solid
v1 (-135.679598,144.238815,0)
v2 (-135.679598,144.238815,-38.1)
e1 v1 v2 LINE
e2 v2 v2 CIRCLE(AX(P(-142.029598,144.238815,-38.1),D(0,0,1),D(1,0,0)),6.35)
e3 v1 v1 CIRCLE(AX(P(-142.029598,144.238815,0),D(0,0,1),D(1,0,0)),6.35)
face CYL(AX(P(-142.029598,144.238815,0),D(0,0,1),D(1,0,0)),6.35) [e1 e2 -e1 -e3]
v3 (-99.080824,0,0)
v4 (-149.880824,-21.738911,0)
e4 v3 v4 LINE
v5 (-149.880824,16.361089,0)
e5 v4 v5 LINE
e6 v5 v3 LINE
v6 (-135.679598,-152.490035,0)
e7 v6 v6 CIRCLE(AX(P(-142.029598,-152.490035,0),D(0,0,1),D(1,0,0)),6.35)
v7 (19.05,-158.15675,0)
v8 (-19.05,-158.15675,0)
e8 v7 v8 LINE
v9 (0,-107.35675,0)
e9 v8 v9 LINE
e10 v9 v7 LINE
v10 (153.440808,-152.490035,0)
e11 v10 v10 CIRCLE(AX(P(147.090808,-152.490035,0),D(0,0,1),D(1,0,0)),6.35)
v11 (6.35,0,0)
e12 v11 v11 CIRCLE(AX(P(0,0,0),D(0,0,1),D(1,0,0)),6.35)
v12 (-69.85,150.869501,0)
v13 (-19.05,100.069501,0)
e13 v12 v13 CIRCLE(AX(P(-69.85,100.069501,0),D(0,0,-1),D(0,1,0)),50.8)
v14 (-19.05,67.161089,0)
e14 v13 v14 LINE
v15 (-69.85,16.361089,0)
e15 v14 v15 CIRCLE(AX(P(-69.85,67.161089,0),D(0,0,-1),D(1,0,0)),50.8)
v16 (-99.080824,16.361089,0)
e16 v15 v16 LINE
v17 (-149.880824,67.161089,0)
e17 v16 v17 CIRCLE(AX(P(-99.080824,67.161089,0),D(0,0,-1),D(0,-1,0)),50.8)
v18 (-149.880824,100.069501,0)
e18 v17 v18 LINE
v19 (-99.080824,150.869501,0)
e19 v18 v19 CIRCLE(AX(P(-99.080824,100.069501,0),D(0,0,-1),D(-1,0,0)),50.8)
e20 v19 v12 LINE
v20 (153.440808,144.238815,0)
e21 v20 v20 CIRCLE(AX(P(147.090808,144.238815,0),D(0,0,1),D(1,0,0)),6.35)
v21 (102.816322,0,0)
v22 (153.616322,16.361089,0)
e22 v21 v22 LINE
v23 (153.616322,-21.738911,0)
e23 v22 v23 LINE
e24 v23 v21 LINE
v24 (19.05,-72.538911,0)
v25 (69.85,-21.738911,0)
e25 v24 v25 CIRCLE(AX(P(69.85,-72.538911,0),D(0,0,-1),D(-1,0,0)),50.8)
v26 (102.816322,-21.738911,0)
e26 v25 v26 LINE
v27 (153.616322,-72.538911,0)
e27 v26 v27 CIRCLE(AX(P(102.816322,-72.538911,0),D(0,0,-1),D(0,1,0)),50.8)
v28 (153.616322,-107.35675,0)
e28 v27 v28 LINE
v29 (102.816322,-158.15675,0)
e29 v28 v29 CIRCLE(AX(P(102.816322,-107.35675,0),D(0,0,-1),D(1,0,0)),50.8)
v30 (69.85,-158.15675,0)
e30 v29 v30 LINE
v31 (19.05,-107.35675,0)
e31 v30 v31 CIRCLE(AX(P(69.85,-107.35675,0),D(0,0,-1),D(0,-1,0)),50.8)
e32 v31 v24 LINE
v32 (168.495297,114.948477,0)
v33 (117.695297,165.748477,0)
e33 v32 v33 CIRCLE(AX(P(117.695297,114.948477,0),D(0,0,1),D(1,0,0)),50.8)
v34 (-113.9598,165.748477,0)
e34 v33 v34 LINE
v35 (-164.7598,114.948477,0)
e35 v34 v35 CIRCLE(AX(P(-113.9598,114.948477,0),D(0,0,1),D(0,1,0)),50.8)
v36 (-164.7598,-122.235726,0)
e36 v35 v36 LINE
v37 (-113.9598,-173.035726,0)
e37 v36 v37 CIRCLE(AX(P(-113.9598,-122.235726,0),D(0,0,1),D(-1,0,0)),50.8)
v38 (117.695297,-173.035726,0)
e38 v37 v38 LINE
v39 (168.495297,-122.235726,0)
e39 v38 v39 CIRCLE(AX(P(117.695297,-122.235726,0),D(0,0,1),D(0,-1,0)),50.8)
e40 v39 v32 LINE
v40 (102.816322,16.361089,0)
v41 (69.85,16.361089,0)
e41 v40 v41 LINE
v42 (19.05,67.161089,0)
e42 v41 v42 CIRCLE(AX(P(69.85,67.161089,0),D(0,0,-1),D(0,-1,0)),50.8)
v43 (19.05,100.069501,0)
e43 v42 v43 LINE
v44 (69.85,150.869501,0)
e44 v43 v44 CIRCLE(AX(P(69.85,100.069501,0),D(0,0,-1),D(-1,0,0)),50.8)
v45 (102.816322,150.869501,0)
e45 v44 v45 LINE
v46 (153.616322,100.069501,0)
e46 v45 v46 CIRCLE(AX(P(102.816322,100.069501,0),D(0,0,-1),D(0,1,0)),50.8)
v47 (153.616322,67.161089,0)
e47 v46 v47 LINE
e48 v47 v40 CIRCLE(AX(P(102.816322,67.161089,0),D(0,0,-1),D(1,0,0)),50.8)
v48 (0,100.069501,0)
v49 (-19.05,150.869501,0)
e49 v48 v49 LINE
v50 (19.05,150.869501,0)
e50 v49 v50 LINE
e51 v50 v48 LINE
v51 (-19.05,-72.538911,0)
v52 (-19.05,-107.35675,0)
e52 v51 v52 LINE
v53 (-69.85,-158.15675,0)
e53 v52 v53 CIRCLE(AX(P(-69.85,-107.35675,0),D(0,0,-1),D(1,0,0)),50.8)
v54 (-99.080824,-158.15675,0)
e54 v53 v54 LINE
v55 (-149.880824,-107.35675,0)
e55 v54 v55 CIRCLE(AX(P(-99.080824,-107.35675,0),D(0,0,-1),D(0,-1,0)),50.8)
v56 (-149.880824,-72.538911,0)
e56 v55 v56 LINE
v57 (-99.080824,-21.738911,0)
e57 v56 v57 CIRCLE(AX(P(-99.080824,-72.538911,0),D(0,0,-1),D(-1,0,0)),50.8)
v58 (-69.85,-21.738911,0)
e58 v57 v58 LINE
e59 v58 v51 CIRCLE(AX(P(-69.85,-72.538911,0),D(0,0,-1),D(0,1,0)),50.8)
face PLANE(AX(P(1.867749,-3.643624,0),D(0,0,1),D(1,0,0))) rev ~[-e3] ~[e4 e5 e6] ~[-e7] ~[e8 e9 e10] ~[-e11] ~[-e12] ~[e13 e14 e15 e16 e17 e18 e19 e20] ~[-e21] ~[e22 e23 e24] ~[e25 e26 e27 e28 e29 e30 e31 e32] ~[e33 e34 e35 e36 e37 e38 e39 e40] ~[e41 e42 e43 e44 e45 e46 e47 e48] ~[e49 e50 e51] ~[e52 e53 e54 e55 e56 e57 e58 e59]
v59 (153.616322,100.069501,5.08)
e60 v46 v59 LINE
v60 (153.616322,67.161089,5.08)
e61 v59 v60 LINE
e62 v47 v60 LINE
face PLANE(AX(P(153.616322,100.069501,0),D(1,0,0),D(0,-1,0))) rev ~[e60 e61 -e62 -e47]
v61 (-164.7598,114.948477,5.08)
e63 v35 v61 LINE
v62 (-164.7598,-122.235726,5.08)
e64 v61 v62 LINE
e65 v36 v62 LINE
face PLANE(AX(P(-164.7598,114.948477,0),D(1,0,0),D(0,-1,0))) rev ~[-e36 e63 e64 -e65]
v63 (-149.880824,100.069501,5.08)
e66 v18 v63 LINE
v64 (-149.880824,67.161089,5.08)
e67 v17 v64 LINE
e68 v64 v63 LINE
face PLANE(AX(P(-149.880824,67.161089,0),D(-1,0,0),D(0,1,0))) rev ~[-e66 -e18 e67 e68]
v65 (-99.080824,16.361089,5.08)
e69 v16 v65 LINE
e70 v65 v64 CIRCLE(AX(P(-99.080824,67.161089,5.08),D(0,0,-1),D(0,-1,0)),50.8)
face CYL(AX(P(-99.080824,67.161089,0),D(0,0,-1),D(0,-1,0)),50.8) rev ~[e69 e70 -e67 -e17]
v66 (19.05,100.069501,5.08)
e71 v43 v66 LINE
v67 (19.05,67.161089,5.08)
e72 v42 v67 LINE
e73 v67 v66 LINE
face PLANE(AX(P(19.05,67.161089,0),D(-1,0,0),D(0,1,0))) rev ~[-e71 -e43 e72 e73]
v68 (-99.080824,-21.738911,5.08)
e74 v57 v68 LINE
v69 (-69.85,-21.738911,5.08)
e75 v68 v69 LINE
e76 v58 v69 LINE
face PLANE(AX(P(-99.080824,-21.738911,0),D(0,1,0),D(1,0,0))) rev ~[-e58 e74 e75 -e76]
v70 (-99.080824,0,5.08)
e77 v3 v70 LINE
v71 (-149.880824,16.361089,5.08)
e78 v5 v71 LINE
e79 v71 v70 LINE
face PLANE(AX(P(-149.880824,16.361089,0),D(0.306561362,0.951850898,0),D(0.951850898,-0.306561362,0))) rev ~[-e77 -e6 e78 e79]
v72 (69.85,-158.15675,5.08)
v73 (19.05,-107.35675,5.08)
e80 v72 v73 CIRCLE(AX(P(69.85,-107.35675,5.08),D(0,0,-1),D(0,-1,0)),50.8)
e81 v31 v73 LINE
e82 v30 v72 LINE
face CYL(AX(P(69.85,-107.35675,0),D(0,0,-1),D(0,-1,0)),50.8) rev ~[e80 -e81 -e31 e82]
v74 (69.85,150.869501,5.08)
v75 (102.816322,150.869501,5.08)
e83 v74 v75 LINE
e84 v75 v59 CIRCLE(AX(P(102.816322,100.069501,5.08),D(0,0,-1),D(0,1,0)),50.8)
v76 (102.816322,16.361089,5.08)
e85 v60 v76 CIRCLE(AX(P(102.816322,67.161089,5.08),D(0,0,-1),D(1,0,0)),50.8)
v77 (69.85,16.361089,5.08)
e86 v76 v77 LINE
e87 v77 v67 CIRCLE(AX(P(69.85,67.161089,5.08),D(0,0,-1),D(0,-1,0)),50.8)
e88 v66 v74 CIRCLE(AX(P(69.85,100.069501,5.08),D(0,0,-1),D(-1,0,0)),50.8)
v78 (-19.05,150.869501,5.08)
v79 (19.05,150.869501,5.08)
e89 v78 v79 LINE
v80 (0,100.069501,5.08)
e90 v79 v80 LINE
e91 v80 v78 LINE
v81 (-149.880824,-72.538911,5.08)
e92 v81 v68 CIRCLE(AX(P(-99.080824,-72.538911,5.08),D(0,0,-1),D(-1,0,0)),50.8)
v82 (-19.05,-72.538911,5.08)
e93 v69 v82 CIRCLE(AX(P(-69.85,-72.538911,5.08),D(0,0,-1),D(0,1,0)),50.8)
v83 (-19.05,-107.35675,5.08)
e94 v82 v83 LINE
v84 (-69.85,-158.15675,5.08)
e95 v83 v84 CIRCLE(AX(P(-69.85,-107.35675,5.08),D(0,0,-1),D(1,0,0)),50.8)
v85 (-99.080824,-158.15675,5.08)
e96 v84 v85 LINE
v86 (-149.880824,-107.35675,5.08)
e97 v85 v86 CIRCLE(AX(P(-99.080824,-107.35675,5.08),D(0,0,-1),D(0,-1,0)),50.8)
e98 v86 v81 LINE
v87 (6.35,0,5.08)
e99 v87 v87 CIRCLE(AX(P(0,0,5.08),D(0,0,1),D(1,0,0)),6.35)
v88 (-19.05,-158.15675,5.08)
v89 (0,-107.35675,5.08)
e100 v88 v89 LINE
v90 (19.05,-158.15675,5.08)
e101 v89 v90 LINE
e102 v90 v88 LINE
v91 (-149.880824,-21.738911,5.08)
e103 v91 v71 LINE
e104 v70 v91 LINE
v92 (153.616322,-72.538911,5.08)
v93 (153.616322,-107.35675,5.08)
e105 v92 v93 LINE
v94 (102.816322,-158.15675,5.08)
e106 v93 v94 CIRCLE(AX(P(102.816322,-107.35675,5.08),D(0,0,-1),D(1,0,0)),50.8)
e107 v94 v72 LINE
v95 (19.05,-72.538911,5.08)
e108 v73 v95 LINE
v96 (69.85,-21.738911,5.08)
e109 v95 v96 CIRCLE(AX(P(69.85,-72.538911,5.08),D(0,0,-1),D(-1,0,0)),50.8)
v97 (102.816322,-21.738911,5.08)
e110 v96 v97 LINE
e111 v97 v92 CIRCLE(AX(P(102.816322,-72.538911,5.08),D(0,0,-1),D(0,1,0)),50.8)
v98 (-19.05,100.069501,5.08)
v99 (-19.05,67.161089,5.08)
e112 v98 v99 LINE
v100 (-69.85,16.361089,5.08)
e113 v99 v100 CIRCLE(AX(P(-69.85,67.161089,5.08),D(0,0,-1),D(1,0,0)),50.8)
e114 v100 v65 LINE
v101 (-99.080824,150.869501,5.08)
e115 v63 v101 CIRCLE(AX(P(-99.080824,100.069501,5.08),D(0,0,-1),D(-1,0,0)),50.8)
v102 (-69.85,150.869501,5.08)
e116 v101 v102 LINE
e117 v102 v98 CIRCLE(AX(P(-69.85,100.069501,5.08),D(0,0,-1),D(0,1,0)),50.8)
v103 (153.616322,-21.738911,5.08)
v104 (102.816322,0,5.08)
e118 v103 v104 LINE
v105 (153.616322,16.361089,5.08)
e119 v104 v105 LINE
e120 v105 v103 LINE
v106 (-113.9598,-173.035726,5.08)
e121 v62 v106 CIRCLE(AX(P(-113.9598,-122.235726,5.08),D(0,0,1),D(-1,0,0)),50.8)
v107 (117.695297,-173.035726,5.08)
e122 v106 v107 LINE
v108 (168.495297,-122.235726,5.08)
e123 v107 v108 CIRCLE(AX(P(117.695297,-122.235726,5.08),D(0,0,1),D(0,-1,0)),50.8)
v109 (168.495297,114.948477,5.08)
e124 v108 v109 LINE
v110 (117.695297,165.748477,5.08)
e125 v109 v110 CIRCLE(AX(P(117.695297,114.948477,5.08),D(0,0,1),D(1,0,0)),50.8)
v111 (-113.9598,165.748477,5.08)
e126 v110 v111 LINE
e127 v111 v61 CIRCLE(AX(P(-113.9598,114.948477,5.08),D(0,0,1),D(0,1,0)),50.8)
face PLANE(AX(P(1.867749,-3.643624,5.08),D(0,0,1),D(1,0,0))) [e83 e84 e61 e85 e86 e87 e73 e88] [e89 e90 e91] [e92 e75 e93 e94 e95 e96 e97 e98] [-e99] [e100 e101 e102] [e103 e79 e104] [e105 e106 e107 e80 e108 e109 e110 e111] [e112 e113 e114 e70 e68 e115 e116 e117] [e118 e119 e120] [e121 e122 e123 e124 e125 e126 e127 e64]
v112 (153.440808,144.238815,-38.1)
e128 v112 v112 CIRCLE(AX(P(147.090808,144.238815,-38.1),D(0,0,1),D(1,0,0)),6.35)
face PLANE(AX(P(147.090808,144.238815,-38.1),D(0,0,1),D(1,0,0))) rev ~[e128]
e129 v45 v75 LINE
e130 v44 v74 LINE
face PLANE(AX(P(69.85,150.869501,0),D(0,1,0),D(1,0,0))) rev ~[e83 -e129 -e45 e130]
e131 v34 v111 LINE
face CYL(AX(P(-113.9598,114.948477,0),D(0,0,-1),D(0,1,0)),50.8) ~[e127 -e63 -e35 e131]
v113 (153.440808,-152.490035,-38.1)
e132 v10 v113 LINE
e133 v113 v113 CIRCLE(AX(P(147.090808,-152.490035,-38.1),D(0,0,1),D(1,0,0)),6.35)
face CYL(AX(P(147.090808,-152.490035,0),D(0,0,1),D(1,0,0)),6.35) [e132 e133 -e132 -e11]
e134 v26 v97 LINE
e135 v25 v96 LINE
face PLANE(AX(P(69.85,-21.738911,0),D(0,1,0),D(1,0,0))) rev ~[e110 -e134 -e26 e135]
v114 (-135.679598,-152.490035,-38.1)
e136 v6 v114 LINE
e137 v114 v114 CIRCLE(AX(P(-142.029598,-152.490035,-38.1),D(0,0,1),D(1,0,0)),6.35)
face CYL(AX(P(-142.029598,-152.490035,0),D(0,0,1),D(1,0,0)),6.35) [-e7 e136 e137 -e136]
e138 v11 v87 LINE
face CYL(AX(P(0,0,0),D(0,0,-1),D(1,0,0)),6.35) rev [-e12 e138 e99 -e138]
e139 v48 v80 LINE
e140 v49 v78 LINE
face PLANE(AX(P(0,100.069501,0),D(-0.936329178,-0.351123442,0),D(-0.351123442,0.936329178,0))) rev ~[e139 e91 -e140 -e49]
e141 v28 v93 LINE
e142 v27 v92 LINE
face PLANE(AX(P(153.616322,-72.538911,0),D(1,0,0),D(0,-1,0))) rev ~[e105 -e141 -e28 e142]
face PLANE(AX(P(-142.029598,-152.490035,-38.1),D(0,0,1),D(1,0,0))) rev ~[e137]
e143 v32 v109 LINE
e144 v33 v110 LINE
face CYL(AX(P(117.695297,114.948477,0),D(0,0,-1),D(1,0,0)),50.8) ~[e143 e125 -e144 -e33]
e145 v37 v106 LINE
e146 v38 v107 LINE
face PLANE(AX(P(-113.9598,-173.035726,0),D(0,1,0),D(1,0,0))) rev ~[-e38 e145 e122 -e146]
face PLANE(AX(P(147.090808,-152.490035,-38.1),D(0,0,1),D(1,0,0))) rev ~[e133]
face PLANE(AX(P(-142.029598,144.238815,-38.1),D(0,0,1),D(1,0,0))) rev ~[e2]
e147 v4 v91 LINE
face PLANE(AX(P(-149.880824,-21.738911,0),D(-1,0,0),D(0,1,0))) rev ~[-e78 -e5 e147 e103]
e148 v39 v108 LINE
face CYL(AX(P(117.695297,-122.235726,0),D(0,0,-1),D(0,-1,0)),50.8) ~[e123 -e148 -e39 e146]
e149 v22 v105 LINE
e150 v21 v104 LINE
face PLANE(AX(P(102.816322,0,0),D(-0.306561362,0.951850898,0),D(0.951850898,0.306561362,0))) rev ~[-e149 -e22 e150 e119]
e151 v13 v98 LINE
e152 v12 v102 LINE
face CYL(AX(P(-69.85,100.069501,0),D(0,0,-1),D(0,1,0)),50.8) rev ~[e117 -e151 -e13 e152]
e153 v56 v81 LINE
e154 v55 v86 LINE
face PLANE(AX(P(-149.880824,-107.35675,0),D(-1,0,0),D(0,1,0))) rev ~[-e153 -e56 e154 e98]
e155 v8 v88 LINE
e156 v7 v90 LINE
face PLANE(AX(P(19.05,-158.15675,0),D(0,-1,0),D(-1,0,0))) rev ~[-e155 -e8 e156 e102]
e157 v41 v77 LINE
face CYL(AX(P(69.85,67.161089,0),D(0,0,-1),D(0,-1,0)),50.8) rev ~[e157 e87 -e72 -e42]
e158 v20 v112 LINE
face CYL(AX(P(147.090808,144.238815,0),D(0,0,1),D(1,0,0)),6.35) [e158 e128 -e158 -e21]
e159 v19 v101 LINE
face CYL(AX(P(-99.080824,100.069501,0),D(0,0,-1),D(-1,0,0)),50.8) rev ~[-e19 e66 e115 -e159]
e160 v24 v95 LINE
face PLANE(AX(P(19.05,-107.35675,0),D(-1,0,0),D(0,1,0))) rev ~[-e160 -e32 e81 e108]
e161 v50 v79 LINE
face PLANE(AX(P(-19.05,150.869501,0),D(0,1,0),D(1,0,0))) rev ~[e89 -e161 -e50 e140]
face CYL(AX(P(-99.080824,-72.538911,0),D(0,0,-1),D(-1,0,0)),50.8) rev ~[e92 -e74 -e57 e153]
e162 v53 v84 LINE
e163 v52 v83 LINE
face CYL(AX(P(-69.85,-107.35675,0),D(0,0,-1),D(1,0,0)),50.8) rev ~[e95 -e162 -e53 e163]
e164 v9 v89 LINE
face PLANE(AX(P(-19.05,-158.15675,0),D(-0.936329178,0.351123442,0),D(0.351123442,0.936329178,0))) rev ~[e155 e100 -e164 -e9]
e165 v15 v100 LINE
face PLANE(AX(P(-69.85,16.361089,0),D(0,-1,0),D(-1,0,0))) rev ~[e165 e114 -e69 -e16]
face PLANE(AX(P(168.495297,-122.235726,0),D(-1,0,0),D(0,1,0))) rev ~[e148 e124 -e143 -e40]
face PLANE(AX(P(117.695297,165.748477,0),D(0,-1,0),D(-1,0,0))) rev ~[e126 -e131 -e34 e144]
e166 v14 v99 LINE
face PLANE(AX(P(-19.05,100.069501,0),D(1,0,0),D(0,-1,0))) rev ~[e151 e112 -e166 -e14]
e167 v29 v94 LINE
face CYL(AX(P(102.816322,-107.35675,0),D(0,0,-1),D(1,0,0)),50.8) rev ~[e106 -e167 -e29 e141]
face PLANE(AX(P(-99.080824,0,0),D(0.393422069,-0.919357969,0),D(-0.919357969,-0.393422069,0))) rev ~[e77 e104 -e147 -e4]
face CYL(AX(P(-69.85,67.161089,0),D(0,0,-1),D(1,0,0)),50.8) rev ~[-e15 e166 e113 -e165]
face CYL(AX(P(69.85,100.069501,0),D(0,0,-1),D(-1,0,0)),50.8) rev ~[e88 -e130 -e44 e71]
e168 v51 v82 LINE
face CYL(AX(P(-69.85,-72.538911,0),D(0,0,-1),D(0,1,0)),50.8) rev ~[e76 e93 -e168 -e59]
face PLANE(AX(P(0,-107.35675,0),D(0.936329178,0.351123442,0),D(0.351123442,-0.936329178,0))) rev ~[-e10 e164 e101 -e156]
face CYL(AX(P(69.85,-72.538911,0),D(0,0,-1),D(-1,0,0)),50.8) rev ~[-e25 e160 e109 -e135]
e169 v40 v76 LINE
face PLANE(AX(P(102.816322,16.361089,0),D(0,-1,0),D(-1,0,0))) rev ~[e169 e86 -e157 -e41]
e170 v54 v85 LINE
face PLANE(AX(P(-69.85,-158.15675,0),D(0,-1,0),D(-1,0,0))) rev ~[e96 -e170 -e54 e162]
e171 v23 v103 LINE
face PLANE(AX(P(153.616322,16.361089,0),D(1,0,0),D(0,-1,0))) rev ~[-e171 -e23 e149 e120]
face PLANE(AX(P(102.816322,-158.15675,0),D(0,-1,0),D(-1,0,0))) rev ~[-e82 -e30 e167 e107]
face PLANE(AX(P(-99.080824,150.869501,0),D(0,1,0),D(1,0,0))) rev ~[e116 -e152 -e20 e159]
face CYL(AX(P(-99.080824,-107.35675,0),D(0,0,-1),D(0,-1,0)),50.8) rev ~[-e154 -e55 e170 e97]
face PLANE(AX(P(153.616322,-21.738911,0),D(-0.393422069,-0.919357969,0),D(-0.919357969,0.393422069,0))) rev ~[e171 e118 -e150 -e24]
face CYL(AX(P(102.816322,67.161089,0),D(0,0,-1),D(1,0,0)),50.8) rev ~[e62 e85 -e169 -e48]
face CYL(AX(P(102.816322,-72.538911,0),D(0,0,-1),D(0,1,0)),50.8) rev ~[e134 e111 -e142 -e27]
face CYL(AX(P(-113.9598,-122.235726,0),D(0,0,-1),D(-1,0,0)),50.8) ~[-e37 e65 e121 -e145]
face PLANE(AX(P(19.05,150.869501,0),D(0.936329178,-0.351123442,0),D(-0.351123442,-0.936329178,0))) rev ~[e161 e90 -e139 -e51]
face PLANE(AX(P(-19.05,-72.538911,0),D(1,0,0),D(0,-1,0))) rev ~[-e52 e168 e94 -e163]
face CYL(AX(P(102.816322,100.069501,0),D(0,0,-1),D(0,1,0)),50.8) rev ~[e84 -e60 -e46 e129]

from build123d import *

# Parameters (mm, degrees)
F0_R     = 6.35
F1_DEPTH = 5.08
F2_R     = 6.35
F3_DEPTH = 38.1


# Not quite as in the source:
# - a feature names something its author has since deleted; it is built from what else it names


with BuildPart() as f1:
    # F0 (on Top) → F1 (new body)
    with BuildSketch(Plane.XY):
        with BuildLine():
            ThreePointArc((-164.7597998381, -122.2357259512), (-149.8808243223, -158.1567504355), (-113.9597998381, -173.0357259512))
            Line((-113.9597998381, -173.0357259512), (117.6952974319, -173.0357259512))
            ThreePointArc((117.6952974319, -173.0357259512), (153.6163219162, -158.1567504355), (168.4952974319, -122.2357259512))
            Line((168.4952974319, -122.2357259512), (168.4952974319, 114.9484769821))
            ThreePointArc((168.4952974319, 114.9484769821), (153.6163219162, 150.8695014664), (117.6952974319, 165.7484769821))
            Line((117.6952974319, 165.7484769821), (-113.9597998381, 165.7484769821))
            ThreePointArc((-113.9597998381, 165.7484769821), (-149.8808243223, 150.8695014664), (-164.7597998381, 114.9484769821))
            Line((-164.7597998381, 114.9484769821), (-164.7597998381, -122.2357259512))
        make_face()
        with BuildLine():
            ThreePointArc((-69.85, -21.7389110476), (-33.9289755157, -36.6178865633), (-19.05, -72.5389110476))
            Line((-19.05, -72.5389110476), (-19.05, -107.3567504355))
            ThreePointArc((-19.05, -107.3567504355), (-33.9289755157, -143.2777749197), (-69.85, -158.1567504355))
            Line((-69.85, -158.1567504355), (-99.0808243223, -158.1567504355))
            ThreePointArc((-99.0808243223, -158.1567504355), (-135.0018488066, -143.2777749197), (-149.8808243223, -107.3567504355))
            Line((-149.8808243223, -107.3567504355), (-149.8808243223, -72.5389110476))
            ThreePointArc((-149.8808243223, -72.5389110476), (-135.0018488066, -36.6178865633), (-99.0808243223, -21.7389110476))
            Line((-99.0808243223, -21.7389110476), (-69.85, -21.7389110476))
        make_face(mode=Mode.SUBTRACT)
        Polygon((-19.05, -158.1567504355), (0, -107.3567504355), (19.05, -158.1567504355), align=None, mode=Mode.SUBTRACT)
        with BuildLine():
            Line((69.85, -21.7389110476), (102.8163219162, -21.7389110476))
            ThreePointArc((102.8163219162, -21.7389110476), (138.7373464005, -36.6178865633), (153.6163219162, -72.5389110476))
            Line((153.6163219162, -72.5389110476), (153.6163219162, -107.3567504355))
            ThreePointArc((153.6163219162, -107.3567504355), (138.7373464005, -143.2777749197), (102.8163219162, -158.1567504355))
            Line((102.8163219162, -158.1567504355), (69.85, -158.1567504355))
            ThreePointArc((69.85, -158.1567504355), (33.9289755157, -143.2777749197), (19.05, -107.3567504355))
            Line((19.05, -107.3567504355), (19.05, -72.5389110476))
            ThreePointArc((19.05, -72.5389110476), (33.9289755157, -36.6178865633), (69.85, -21.7389110476))
        make_face(mode=Mode.SUBTRACT)
        Polygon((-149.8808243223, -21.7389110476), (-149.8808243223, 16.3610889524), (-99.0808243223, 0), align=None, mode=Mode.SUBTRACT)
        Circle(F0_R, mode=Mode.SUBTRACT)
        with BuildLine():
            ThreePointArc((-69.85, 150.8695014664), (-33.9289755157, 135.9905259507), (-19.05, 100.0695014664))
            Line((-19.05, 100.0695014664), (-19.05, 67.1610889524))
            ThreePointArc((-19.05, 67.1610889524), (-33.9289755157, 31.2400644681), (-69.85, 16.3610889524))
            Line((-69.85, 16.3610889524), (-99.0808243223, 16.3610889524))
            ThreePointArc((-99.0808243223, 16.3610889524), (-135.0018488066, 31.2400644681), (-149.8808243223, 67.1610889524))
            Line((-149.8808243223, 67.1610889524), (-149.8808243223, 100.0695014664))
            ThreePointArc((-149.8808243223, 100.0695014664), (-135.0018488066, 135.9905259507), (-99.0808243223, 150.8695014664))
            Line((-99.0808243223, 150.8695014664), (-69.85, 150.8695014664))
        make_face(mode=Mode.SUBTRACT)
        Polygon((19.05, 150.8695014664), (0, 100.0695014664), (-19.05, 150.8695014664), align=None, mode=Mode.SUBTRACT)
        Polygon((153.6163219162, -21.7389110476), (102.8163219162, 0), (153.6163219162, 16.3610889524), align=None, mode=Mode.SUBTRACT)
        with BuildLine():
            ThreePointArc((153.6163219162, 67.1610889524), (138.7373464005, 31.2400644681), (102.8163219162, 16.3610889524))
            Line((102.8163219162, 16.3610889524), (69.85, 16.3610889524))
            ThreePointArc((69.85, 16.3610889524), (33.9289755157, 31.2400644681), (19.05, 67.1610889524))
            Line((19.05, 67.1610889524), (19.05, 100.0695014664))
            ThreePointArc((19.05, 100.0695014664), (33.9289755157, 135.9905259507), (69.85, 150.8695014664))
            Line((69.85, 150.8695014664), (102.8163219162, 150.8695014664))
            ThreePointArc((102.8163219162, 150.8695014664), (138.7373464005, 135.9905259507), (153.6163219162, 100.0695014664))
            Line((153.6163219162, 100.0695014664), (153.6163219162, 67.1610889524))
        make_face(mode=Mode.SUBTRACT)
    extrude(amount=F1_DEPTH)

    # F2 (on Top) → F3 (join)
    with BuildSketch(Plane.XY):
        with Locations((-142.0295983553, -152.4900346994)):
            Circle(F2_R)
        with Locations((-142.0295983553, 144.2388147116)):
            Circle(F2_R)
        with Locations((147.0908075571, 144.2388147116)):
            Circle(F2_R)
        with Locations((147.0908075571, -152.4900346994)):
            Circle(F2_R)
    extrude(amount=-F3_DEPTH)


solid = f1.part
